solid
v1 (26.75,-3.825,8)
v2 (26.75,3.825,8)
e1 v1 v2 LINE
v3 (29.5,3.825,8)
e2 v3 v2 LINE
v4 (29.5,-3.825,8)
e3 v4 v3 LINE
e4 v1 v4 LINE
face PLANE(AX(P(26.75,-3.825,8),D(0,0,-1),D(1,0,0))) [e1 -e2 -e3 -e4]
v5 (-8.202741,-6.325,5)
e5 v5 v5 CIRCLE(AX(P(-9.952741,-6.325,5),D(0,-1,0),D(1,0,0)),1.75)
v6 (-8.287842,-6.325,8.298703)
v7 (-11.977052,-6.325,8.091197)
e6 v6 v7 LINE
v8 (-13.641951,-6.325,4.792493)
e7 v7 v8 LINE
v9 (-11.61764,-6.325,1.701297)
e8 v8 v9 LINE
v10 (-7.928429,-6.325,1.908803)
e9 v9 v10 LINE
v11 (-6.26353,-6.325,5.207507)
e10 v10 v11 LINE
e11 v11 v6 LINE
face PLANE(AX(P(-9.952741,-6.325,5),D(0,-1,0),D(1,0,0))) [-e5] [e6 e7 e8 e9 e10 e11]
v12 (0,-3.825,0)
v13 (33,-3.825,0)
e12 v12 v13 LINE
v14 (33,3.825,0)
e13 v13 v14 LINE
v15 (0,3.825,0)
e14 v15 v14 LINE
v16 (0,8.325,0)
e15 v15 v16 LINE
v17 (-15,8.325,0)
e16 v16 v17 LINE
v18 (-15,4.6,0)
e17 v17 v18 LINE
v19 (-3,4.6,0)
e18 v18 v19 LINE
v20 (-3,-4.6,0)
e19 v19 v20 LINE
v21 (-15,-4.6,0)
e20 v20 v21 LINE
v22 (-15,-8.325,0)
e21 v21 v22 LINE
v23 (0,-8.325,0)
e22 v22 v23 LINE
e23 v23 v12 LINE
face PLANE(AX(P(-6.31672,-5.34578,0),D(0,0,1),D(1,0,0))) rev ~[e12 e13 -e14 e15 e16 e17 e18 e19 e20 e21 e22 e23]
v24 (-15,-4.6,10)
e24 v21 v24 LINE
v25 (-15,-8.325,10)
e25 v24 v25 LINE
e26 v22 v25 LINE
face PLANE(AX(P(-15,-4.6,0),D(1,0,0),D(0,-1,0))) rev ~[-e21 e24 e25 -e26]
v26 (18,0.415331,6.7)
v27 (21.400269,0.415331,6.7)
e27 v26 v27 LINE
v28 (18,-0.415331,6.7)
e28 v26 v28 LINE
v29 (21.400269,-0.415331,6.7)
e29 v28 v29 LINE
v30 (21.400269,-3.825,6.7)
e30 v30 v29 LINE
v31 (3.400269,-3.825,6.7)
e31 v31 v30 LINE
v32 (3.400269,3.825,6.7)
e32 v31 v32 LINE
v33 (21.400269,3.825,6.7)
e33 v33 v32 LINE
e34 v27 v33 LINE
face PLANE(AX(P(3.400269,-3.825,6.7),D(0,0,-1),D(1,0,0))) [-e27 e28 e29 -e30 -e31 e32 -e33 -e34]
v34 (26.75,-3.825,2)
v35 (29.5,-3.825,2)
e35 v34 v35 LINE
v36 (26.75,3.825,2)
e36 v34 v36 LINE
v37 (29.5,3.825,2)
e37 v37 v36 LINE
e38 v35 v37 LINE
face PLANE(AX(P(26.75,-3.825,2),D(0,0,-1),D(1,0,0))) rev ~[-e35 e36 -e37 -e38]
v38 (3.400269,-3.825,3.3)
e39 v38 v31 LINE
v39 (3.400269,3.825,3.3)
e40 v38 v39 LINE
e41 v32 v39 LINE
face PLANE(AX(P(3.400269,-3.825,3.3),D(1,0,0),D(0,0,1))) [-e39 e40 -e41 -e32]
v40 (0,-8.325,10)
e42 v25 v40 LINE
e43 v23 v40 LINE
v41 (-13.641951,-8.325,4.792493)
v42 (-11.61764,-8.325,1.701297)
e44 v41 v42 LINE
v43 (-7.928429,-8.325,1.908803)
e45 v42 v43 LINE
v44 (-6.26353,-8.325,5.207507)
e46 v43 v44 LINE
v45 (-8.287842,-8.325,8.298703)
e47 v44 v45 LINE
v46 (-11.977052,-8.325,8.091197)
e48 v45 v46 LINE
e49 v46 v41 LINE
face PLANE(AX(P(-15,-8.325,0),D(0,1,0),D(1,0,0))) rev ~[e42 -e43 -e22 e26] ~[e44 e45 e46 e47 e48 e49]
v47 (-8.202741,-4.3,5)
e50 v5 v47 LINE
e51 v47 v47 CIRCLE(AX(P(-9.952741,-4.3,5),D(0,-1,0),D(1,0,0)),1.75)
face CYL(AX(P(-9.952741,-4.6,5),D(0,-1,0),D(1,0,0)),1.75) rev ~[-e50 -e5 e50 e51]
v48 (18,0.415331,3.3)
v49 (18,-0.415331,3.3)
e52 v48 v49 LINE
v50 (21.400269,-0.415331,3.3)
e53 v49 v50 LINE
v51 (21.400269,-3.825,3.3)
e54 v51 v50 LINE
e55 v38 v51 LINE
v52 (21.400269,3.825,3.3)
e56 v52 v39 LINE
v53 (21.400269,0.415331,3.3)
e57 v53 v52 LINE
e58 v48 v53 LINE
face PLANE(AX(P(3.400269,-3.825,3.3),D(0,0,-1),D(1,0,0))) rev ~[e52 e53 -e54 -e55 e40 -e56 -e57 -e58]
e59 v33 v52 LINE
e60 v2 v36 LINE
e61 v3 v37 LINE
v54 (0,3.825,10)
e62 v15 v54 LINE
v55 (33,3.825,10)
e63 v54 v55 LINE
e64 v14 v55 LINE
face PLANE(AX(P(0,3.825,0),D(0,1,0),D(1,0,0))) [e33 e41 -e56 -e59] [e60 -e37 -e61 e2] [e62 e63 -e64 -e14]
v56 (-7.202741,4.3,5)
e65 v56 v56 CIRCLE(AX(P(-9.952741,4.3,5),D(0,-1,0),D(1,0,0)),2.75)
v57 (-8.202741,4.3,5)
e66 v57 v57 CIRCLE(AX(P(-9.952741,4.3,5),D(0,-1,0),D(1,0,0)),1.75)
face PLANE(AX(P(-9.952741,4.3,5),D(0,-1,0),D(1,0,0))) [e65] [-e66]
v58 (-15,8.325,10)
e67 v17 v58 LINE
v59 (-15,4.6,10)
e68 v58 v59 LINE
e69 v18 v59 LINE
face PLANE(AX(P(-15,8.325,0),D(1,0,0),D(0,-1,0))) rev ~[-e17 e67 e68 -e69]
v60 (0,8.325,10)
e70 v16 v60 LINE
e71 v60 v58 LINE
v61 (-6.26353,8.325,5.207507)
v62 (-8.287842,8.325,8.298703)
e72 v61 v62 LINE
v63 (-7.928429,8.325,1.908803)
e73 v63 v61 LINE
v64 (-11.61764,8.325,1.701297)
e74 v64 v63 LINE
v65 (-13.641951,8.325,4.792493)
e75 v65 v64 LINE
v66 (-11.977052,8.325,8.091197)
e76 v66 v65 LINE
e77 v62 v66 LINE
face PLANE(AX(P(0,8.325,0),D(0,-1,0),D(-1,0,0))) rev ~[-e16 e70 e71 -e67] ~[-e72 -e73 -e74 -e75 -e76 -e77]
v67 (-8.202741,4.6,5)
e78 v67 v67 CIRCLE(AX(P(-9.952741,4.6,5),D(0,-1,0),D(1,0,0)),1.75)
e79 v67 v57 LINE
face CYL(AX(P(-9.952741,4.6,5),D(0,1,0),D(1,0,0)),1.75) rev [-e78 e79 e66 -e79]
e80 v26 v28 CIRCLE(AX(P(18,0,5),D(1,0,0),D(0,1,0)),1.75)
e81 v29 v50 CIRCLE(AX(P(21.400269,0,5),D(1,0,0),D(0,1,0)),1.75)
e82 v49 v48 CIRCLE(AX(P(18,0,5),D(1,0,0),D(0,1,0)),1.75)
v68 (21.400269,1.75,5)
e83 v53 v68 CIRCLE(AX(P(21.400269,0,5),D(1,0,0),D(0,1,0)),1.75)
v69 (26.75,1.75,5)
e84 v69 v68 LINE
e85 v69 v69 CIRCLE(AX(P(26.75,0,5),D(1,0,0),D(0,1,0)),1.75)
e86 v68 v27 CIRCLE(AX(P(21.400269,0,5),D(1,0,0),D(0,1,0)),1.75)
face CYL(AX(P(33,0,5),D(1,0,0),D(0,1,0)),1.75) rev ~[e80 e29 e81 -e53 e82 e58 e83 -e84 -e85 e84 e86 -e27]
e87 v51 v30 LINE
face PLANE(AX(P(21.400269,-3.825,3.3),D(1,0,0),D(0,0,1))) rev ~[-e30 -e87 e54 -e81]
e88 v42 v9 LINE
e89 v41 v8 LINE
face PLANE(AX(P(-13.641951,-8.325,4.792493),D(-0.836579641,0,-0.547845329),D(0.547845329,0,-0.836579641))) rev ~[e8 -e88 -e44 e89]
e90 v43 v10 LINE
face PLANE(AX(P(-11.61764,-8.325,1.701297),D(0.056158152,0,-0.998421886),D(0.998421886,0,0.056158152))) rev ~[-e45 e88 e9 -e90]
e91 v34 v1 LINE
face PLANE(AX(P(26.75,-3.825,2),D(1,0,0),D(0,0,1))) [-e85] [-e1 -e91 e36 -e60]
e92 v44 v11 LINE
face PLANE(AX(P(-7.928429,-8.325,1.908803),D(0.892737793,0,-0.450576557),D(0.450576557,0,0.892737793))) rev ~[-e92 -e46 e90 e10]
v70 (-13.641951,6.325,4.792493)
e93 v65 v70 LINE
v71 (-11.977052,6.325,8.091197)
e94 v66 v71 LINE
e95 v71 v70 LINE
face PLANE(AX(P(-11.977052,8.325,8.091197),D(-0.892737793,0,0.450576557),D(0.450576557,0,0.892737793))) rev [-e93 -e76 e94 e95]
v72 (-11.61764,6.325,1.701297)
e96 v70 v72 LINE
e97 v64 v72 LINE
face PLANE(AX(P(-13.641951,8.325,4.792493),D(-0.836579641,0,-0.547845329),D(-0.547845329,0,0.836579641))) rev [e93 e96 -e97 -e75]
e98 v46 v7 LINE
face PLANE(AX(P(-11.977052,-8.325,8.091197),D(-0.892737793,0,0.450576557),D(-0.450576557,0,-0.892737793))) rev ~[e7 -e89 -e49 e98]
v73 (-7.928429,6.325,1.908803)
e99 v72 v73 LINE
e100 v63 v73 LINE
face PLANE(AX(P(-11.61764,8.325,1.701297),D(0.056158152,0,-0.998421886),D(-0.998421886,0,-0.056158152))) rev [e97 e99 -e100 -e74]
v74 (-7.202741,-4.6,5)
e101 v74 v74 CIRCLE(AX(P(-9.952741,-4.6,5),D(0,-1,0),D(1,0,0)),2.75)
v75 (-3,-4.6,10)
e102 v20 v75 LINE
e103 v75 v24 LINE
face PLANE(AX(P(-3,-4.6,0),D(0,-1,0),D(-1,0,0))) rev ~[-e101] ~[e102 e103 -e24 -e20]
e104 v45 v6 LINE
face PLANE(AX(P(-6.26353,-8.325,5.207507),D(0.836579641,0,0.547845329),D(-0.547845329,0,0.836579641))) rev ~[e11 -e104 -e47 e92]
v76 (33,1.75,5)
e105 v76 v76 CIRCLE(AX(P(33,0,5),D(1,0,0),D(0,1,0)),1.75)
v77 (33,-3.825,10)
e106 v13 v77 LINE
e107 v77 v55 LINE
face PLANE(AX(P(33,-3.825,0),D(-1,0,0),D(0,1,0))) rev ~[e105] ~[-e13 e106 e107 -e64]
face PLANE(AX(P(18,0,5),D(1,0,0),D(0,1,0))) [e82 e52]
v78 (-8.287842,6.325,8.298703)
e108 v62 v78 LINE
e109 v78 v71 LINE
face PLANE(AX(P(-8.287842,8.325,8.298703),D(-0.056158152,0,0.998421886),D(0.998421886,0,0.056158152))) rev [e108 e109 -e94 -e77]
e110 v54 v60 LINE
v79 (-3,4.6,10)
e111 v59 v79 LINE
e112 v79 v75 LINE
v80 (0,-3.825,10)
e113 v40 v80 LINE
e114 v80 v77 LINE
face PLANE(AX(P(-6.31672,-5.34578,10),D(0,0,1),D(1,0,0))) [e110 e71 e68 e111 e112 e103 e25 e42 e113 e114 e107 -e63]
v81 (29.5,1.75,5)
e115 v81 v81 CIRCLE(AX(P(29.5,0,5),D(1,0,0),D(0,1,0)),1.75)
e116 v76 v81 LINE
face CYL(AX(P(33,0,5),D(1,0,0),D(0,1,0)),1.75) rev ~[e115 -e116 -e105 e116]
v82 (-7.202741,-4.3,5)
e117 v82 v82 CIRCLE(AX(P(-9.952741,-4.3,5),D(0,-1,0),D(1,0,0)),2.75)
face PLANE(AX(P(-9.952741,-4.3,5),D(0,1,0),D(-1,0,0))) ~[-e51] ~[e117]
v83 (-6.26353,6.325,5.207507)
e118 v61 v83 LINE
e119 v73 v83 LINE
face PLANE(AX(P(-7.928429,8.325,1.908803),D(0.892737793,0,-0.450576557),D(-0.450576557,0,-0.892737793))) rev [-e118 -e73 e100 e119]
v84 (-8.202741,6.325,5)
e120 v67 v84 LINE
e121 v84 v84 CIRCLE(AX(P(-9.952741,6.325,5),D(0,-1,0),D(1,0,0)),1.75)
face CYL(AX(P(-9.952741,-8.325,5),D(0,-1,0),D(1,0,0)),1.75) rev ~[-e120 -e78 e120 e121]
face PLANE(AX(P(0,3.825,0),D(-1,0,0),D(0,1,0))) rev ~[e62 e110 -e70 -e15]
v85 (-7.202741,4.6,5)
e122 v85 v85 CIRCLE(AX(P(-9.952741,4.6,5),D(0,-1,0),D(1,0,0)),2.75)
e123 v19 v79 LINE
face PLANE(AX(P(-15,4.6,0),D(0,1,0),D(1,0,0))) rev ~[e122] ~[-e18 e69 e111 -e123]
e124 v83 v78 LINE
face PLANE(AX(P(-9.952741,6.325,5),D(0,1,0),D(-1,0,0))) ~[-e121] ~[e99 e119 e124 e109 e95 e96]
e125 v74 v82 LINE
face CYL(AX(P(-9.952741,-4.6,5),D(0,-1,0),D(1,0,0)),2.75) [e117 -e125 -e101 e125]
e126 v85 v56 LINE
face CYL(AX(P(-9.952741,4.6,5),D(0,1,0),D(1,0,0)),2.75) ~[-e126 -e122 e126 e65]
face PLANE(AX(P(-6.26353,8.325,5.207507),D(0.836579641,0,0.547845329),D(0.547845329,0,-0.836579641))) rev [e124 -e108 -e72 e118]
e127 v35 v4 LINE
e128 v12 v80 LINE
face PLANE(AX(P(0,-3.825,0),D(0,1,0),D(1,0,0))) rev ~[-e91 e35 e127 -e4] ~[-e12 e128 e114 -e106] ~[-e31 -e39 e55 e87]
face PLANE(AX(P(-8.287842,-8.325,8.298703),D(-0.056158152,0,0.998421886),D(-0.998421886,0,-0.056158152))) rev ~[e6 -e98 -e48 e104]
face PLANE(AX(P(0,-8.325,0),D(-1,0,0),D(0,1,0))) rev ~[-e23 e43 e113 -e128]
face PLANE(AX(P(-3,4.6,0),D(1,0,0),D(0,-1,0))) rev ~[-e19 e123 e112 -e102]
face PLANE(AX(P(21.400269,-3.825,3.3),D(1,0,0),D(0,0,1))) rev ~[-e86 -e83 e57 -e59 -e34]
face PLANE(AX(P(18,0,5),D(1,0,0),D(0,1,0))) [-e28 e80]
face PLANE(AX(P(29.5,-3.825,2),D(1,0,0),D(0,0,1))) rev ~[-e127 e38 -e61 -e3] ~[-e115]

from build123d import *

# Parameters (mm, degrees)
F0_W      = 33
F0_H      = 3.825
F1_DEPTH  = 10
F2_R      = 1.75
F3_DEPTH  = 16.651
F4_W      = 18
F4_H      = 3.4
F4_W_2    = 2.75
F4_H_2    = 6
F5_DEPTH  = 12.151
F6_R      = 1.75
F7_DEPTH  = 15
F10_DEPTH = 2
F11_W     = 17.65
F11_H     = 60
F12_DEPTH = 8
F13_R     = 1.75
F14_DEPTH = 63.001
F15_R     = 2.75
F15_R_2   = 1.75
F16_DEPTH = 0.3
F17_R     = 1.75
F18_DEPTH = 2
F19_R     = 3.75
F20_DEPTH = 4


# Not quite as in the source:
# - a pattern or mirror of a feature is missing from the dataset's text; its kind, count and spacing are read off the source's solid


with BuildPart() as f1:
    # F0 (on Top) → F1 (new body)
    with BuildSketch(Plane.XY):
        Polygon((0, -3.825), (0, 0), (-3, 0), (-3, -4.6), (-15, -4.6), (-15, -8.325), (0, -8.325), align=None)
        Polygon((-3, 0), (0, 0), (0, 3.825), (0, 8.325), (-15, 8.325), (-15, 4.6), (-3, 4.6), align=None)
        with Locations((16.5, 1.9125)):
            Rectangle(F0_W, F0_H)
        with Locations((16.5, -1.9125)):
            Rectangle(F0_W, F0_H)
    extrude(amount=F1_DEPTH)

    # F2 (on face) → F3 (cut, through all)
    with BuildSketch(Plane.XZ.offset(8.325)):
        with Locations((-9.9527407438, 5)):
            Circle(F2_R)
    extrude(amount=-F3_DEPTH, mode=Mode.SUBTRACT)

    # F4 (on face) → F5 (cut, through all)
    with BuildSketch(Plane.XZ.offset(3.825)):
        with Locations((12.4002694301, 5)):
            Rectangle(F4_W, F4_H)
        with Locations((28.125, 5)):
            Rectangle(F4_W_2, F4_H_2)
    extrude(amount=-F5_DEPTH, mode=Mode.SUBTRACT)

    # F6 (on face) → F7 (cut)
    with BuildSketch(Plane.YZ.offset(33)):
        with Locations((0, 5)):
            Circle(F6_R)
    extrude(amount=-F7_DEPTH, mode=Mode.SUBTRACT)

    # F15 (on face) → F16 (join)
    with BuildSketch(Plane.XZ.offset(-4.6)):
        with Locations((-9.9527407438, 5)):
            Circle(F15_R)
        with Locations((-9.9527407438, 5)):
            Circle(F15_R_2, mode=Mode.SUBTRACT)
    f16 = extrude(amount=F16_DEPTH)

    # F16_copies: F16 across plane
    add(f16.mirror(Plane(origin=(0, 0, 0), x_dir=(0, 0, -1), z_dir=(0, -1, 0))))

    # F17 (on face) → F18 (cut)
    with BuildSketch(Plane.XZ.offset(8.325)):
        Polygon((-7.9284293953, 1.9088033227), (-6.2635302189, 5.2075067143), (-8.2878415673, 8.2987033916), (-11.9770520922, 8.0911966773), (-13.6419512686, 4.7924932857), (-11.6176399202, 1.7012966084), align=None)
        with Locations((-9.9527407438, 5)):
            Circle(F17_R, mode=Mode.SUBTRACT)
    f18 = extrude(amount=-F18_DEPTH, mode=Mode.SUBTRACT)

    # F18_copies: F18 across plane
    add(f18.mirror(Plane.ZX), mode=Mode.SUBTRACT)


with BuildPart() as f10:
    # F9 (on offset) → F10 (new body)
    with BuildSketch(Plane.YZ.offset(38)):
        Polygon((3.825, 0), (3.825, 10), (3.825, 19.8484882712), (-3.825, 19.8484882712), (-3.825, 10), (-3.825, 0), (-3.825, -10.1515117288), (3.825, -10.1515117288), align=None)
    extrude(amount=F10_DEPTH)

    # F11 (on face) → F12 (join)
    with BuildSketch(Plane.YZ.offset(40)):
        with Locations((0, 4.8484882712)):
            Rectangle(F11_W, F11_H)
    extrude(amount=F12_DEPTH)

    # F13 (on face) → F14 (cut, through all)
    with BuildSketch(Plane.YZ.offset(48)):
        with Locations((0, 5)):
            Circle(F13_R)
    extrude(amount=-F14_DEPTH, mode=Mode.SUBTRACT)

    # F19 (on face) → F20 (join)
    with BuildSketch(Plane(origin=(40, 0, 0), x_dir=(0, -1, 0), z_dir=(-1, 0, 0))):
        with Locations((0, 28)):
            Circle(F19_R)
        with Locations((0, -18)):
            Circle(F19_R)
    extrude(amount=F20_DEPTH)


solid = f1.part
